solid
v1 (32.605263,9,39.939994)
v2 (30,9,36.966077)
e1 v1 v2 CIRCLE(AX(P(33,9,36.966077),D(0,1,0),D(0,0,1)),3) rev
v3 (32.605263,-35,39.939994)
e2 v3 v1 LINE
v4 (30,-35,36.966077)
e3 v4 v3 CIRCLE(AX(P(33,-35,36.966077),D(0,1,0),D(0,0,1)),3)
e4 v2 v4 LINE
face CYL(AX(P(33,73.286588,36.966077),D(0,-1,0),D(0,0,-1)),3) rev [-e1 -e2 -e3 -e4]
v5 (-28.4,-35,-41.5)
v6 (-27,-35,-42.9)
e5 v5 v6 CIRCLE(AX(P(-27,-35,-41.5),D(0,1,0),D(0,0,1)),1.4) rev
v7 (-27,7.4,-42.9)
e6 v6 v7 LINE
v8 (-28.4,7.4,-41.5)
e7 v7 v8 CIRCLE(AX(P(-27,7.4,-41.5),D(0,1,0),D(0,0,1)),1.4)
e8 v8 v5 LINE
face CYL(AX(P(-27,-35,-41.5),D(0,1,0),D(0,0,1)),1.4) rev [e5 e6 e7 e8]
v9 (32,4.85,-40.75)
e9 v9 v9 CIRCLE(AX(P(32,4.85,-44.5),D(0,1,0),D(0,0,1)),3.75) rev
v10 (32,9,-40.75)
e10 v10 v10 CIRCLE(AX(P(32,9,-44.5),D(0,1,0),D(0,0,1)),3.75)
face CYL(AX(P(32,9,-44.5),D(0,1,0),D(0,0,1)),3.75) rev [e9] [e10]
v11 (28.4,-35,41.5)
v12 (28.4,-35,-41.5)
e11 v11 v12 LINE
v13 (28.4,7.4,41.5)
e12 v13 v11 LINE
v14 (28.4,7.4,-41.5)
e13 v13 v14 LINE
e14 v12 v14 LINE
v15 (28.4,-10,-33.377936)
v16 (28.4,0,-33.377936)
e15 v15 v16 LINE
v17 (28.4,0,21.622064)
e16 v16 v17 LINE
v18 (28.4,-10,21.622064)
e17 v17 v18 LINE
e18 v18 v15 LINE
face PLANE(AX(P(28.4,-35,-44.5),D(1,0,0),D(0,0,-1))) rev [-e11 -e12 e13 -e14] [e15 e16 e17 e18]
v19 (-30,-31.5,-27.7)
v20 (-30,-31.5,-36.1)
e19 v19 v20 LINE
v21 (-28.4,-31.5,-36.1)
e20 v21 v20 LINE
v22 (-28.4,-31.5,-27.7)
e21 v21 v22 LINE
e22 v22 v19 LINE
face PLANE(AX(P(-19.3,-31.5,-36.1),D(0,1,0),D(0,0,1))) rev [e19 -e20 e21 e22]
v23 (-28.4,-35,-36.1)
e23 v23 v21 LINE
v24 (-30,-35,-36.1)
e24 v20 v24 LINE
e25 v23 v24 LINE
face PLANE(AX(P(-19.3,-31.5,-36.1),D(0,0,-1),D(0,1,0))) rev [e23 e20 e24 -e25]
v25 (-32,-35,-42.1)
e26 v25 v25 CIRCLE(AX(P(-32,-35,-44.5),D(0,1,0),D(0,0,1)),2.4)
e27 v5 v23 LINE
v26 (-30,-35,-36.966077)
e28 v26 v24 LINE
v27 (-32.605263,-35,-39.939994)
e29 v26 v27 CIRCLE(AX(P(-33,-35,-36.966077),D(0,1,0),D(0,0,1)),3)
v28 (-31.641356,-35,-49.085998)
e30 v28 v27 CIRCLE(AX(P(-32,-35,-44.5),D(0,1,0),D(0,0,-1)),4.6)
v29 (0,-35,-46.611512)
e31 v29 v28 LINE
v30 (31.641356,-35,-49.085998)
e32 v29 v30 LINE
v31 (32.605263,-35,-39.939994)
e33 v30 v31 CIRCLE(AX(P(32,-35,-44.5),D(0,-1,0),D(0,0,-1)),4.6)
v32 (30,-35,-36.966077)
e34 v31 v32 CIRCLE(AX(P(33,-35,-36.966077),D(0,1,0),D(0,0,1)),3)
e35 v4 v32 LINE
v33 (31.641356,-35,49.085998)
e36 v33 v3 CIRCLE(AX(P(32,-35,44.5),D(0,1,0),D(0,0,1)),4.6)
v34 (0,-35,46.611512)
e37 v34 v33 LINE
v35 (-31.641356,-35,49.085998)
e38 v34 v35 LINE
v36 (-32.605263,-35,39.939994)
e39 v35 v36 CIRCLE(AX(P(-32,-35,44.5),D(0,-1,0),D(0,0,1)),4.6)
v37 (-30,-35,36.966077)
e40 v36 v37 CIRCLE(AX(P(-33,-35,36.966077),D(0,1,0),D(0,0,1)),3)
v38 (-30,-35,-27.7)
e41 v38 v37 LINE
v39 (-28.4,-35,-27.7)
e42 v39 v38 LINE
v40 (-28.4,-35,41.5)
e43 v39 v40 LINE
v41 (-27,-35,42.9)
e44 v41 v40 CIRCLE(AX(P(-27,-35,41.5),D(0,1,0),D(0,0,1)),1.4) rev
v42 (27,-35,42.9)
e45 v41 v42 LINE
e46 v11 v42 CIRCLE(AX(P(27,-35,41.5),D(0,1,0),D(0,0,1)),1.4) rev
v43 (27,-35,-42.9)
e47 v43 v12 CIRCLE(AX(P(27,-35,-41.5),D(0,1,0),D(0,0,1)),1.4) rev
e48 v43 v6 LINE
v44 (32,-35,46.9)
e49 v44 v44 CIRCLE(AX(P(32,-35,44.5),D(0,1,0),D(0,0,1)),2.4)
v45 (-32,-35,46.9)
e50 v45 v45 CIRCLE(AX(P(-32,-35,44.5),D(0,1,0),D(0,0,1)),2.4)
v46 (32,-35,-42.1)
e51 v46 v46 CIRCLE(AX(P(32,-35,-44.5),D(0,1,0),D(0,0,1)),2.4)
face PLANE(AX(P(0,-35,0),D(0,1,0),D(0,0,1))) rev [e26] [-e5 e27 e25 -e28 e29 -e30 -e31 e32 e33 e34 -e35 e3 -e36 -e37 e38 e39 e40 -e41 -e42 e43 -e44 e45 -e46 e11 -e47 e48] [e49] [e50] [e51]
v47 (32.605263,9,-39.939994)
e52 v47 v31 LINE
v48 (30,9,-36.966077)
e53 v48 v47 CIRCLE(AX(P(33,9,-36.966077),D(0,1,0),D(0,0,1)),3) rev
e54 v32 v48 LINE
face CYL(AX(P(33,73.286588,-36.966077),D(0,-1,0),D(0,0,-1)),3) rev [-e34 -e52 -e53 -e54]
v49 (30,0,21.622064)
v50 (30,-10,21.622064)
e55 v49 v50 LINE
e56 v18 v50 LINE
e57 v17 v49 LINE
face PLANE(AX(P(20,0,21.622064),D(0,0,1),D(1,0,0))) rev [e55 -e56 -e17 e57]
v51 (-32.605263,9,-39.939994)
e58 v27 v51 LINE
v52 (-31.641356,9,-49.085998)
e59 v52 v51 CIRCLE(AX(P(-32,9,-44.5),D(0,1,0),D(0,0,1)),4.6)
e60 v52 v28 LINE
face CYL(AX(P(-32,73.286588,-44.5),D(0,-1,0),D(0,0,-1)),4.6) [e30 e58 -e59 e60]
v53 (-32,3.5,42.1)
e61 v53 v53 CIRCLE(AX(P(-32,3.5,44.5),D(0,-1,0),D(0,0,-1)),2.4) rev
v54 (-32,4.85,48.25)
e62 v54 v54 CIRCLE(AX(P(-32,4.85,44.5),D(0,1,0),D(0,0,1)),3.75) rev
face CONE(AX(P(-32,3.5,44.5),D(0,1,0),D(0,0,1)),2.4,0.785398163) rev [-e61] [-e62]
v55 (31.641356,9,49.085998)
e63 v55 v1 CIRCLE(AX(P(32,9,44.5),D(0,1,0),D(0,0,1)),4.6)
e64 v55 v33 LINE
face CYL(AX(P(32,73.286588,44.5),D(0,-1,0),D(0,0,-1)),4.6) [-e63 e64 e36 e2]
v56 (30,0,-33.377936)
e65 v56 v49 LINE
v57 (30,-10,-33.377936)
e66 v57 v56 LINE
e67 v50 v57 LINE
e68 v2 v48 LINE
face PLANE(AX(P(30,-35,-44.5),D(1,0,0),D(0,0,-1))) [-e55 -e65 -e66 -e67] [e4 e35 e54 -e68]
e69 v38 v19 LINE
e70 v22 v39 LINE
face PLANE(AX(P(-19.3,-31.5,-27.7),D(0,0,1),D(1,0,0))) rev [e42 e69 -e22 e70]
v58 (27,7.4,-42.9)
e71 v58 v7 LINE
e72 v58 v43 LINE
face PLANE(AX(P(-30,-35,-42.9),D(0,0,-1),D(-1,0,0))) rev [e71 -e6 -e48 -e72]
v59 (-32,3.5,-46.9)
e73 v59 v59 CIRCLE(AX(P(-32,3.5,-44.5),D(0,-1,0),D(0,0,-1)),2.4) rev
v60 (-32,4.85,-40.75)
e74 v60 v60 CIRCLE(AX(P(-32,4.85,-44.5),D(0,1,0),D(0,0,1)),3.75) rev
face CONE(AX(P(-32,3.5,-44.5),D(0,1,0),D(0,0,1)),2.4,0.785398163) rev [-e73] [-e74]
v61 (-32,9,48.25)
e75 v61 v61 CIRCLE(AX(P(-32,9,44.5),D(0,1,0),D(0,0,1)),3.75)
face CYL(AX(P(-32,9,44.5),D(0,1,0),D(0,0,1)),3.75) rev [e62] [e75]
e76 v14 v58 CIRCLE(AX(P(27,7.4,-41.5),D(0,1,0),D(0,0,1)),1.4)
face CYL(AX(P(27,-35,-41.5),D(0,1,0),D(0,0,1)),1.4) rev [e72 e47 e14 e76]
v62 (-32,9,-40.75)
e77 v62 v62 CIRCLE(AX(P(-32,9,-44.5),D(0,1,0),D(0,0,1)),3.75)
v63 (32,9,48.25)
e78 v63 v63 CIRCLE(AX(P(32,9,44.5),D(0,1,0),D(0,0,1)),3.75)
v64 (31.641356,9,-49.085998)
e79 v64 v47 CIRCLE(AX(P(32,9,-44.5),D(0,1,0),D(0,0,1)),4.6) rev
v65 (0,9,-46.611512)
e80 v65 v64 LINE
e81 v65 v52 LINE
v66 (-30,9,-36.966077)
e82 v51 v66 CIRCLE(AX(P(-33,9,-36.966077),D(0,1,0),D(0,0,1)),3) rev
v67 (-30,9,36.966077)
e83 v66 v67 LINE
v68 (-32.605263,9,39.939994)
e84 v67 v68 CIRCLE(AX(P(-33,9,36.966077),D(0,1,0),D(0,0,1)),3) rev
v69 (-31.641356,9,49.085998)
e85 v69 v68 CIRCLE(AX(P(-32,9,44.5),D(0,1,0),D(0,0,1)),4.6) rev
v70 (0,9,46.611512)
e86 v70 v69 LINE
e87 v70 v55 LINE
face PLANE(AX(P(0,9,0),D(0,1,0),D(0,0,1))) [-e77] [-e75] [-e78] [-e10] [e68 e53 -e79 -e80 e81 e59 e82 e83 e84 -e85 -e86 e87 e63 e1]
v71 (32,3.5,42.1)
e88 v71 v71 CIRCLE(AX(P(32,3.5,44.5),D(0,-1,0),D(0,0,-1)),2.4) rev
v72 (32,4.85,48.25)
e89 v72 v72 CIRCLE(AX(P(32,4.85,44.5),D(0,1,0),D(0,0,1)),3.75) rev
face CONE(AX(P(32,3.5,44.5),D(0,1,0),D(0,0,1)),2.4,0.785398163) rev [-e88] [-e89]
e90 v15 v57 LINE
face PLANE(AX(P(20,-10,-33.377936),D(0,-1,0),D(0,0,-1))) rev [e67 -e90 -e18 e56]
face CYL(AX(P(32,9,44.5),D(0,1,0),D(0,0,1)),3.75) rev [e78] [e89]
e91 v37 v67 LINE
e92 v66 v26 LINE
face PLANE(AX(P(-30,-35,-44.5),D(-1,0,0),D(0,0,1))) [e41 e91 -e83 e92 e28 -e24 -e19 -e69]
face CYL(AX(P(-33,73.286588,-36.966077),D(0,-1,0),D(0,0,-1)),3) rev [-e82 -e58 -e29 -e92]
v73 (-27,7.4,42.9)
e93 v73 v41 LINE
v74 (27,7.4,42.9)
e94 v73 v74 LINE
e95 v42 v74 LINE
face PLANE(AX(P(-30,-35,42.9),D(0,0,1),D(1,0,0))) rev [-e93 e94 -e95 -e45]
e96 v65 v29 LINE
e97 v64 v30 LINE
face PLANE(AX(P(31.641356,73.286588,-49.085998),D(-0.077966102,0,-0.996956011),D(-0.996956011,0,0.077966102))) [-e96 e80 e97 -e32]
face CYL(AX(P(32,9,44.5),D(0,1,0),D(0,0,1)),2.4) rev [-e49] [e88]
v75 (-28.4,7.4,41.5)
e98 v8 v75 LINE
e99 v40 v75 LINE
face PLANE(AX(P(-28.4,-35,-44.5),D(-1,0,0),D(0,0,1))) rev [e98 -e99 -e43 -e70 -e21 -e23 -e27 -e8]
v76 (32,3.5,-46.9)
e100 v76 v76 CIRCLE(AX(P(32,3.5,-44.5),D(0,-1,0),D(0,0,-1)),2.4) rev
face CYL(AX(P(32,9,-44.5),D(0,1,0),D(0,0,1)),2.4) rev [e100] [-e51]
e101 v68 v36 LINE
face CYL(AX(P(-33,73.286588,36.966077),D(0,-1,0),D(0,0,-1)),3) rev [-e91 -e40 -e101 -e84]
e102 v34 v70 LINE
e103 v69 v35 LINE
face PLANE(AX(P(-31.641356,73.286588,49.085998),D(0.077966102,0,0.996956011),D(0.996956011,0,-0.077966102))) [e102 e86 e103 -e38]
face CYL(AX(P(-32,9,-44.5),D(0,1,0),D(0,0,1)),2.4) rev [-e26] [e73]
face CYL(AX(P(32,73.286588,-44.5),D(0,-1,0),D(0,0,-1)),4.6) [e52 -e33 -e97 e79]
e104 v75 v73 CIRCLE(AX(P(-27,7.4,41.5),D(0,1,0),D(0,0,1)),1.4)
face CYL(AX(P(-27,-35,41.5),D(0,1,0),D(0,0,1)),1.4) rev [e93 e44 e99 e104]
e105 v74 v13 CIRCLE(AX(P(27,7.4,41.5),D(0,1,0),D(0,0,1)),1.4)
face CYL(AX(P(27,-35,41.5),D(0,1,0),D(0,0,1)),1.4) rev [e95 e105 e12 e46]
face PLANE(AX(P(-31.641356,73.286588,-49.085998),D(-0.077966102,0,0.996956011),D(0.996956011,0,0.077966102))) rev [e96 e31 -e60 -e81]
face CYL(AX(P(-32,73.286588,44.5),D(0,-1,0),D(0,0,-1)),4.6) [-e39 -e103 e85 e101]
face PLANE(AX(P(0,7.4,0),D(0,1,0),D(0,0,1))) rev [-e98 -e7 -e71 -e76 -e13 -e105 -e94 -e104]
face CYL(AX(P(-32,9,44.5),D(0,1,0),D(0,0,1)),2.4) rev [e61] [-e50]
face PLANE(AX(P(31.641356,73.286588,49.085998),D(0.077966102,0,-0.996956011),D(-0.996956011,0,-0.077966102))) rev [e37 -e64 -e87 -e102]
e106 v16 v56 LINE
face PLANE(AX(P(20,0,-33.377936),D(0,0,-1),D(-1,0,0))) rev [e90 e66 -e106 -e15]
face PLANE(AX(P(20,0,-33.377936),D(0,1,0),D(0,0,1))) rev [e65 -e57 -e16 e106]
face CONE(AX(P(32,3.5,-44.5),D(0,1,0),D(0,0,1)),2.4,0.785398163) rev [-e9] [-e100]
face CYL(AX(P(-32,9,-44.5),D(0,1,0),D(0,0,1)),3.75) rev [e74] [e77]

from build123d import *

# Parameters (mm, degrees)
BASE_DEPTH                               = 9
BASE_DEPTH_BACK                          = 35
SKETCH1_W                                = 60
SKETCH1_H                                = 89
OUTSIDE_OF_BASE_R                        = 3
INSIDE_OF_BASE_T                         = -1.6
TOP_START                                = -44
TOP_FASTENING_BODY_DEPTH                 = 44
CBORE_FOR_M4_SHCS1_D                     = 4.8
CBORE_FOR_M4_SHCS1_CBORE_D               = 7.5
CBORE_FOR_M4_SHCS1_CBORE_DEPTH           = 4
TFB_START                                = -44
TFB_M_V_COPY_1_DEPTH                     = 44
TFB_M_V_COPY_2_D                         = 4.8
TFB_M_V_COPY_2_CBORE_D                   = 7.5
TFB_M_V_COPY_2_CBORE_DEPTH               = 4
SKETCH12_W                               = 8.4
SKETCH12_H                               = 3.5
MICROUSB_DEPTH                           = 1.6
F_3D_PRINTING_FOR_FASTENING_FEATURE_SIZE = 1.5
TFB_OUTER_R                              = 3
SKETCH28_W                               = 55
SKETCH28_H                               = 10
CUT_EXTRUDE1_DEPTH                       = 10


with BuildPart() as part:
    # Sketch1 → BASE (new, two sides: drawn at the far end of the back side and taken through both)
    with BuildSketch(Plane(origin=(0, 0, 0), x_dir=(1, 0, 0), z_dir=(0, 1, 0)).offset(-BASE_DEPTH_BACK)):
        Rectangle(SKETCH1_W, SKETCH1_H)
    extrude(amount=BASE_DEPTH + BASE_DEPTH_BACK)

    # OUTSIDE OF BASE
    outside_of_base_edges = [part.edges().sort_by_distance(p)[0] for p in [
        (30, -13, 44.5),
        (-30, -13, 44.5),
        (-30, -13, -44.5),
        (30, -13, -44.5),
    ]]
    fillet(outside_of_base_edges, radius=OUTSIDE_OF_BASE_R)

    # INSIDE OF BASE
    inside_of_base_openings = [part.faces().sort_by_distance(p)[0] for p in [
        (0, -35, 0),
    ]]
    offset(amount=INSIDE_OF_BASE_T, openings=inside_of_base_openings, kind=Kind.INTERSECTION)

    # Sketch22 → TOP FASTENING BODY (add)
    with BuildSketch(Plane.XZ.offset(35).offset(TOP_START)):
        with BuildLine():
            Line((-31.641355932, 49.085997649), (27, 44.5))
            Line((27, 44.5), (-27, 44.5))
            ThreePointArc((-27, 44.5), (-29.121320344, 43.621320344), (-30, 41.5))
            Line((-30, 41.5), (-30, 39.729546587))
            Line((-30, 39.729546587), (-32.358644068, 39.914002351))
            ThreePointArc((-32.358644068, 39.914002351), (-36.585997649, 44.858644068), (-31.641355932, 49.085997649))
        make_face()
    top_fastening_body = extrude(amount=TOP_FASTENING_BODY_DEPTH)

    # CBORE for M4 SHCS1 (through all)
    with Locations(Plane(origin=(0, 9, 0), x_dir=(1, 0, 0), z_dir=(0, 1, 0))):
        with Locations((-32, -44.5)):
            cbore_for_m4_shcs1 = CounterBoreHole(CBORE_FOR_M4_SHCS1_D / 2, CBORE_FOR_M4_SHCS1_CBORE_D / 2, CBORE_FOR_M4_SHCS1_CBORE_DEPTH)

    # TFB M H: TOP FASTENING BODY, CBORE for M4 SHCS1 across plane
    add(top_fastening_body.mirror(Plane(origin=(0, 0, 0), x_dir=(0, 0, 1), z_dir=(1, 0, 0))))
    add(cbore_for_m4_shcs1.mirror(Plane(origin=(0, 0, 0), x_dir=(0, 0, 1), z_dir=(1, 0, 0))), mode=Mode.SUBTRACT)

    # TFB M V: TOP FASTENING BODY, CBORE for M4 SHCS1 across plane
    add(top_fastening_body.mirror(Plane.XY))
    add(cbore_for_m4_shcs1.mirror(Plane.XY), mode=Mode.SUBTRACT)

    # TFB M V copy 1 sketch → TFB M V copy 1 (add)
    with BuildSketch(Plane(origin=(0, -35, 0), x_dir=(-1, 0, 0), z_dir=(0, -1, 0)).offset(TFB_START)):
        with BuildLine():
            Line((-31.641355932, 49.085997649), (27, 44.5))
            Line((27, 44.5), (-27, 44.5))
            ThreePointArc((-27, 44.5), (-29.121320344, 43.621320344), (-30, 41.5))
            Line((-30, 41.5), (-30, 39.729546587))
            Line((-30, 39.729546587), (-32.358644068, 39.914002351))
            ThreePointArc((-32.358644068, 39.914002351), (-36.585997649, 44.858644068), (-31.641355932, 49.085997649))
        make_face()
    extrude(amount=TFB_M_V_COPY_1_DEPTH)

    # TFB M V copy 2 (through all)
    with Locations(Plane(origin=(0, 9, 0), x_dir=(-1, 0, 0), z_dir=(0, 1, 0))):
        with Locations((-32, -44.5)):
            CounterBoreHole(TFB_M_V_COPY_2_D / 2, TFB_M_V_COPY_2_CBORE_D / 2, TFB_M_V_COPY_2_CBORE_DEPTH)

    # Sketch12 → MICROUSB (cut)
    with BuildSketch(Plane.ZY.offset(30)):
        with Locations((-31.9, -33.25)):
            Rectangle(SKETCH12_W, SKETCH12_H)
    extrude(amount=-MICROUSB_DEPTH, mode=Mode.SUBTRACT)

    # 3D PRINTING FOR FASTENING FEATURE
    # the kernel refuses this chamfer: 1.5 mm, written as the material it takes off along each edge
    with BuildSketch(Plane(origin=(32, 5, 44.5), x_dir=(1, 0, 0), z_dir=(0, 0, 1))) as f_3d_printing_for_fastening_feature_piece_1_section:
        Polygon((2.4 + F_3D_PRINTING_FOR_FASTENING_FEATURE_SIZE, 0), (2.4, -F_3D_PRINTING_FOR_FASTENING_FEATURE_SIZE), (2.4, 0), align=None)
    f_3d_printing_for_fastening_feature_piece_1 = revolve(axis=Axis((32, 5, 44.5), (0, 1, 0)), mode=Mode.PRIVATE)
    f_3d_printing_for_fastening_feature_piece_1 = f_3d_printing_for_fastening_feature_piece_1 & Plane(origin=(32, 4.173590616, 44.5), x_dir=(-1, 0, 0), z_dir=(0, 1, 0)) * Cylinder(3.75, 16, mode=Mode.PRIVATE)
    add(f_3d_printing_for_fastening_feature_piece_1, mode=Mode.SUBTRACT)
    with BuildSketch(Plane(origin=(32, 5, -44.5), x_dir=(1, 0, 0), z_dir=(0, 0, -1))) as f_3d_printing_for_fastening_feature_piece_2_section:
        Polygon((2.4 + F_3D_PRINTING_FOR_FASTENING_FEATURE_SIZE, 0), (2.4, F_3D_PRINTING_FOR_FASTENING_FEATURE_SIZE), (2.4, 0), align=None)
    f_3d_printing_for_fastening_feature_piece_2 = revolve(axis=Axis((32, 5, -44.5), (0, -1, 0)), mode=Mode.PRIVATE)
    f_3d_printing_for_fastening_feature_piece_2 = f_3d_printing_for_fastening_feature_piece_2 & Plane(origin=(32, 4.173590616, -44.5), x_dir=(-1, 0, 0), z_dir=(0, 1, 0)) * Cylinder(3.75, 16, mode=Mode.PRIVATE)
    add(f_3d_printing_for_fastening_feature_piece_2, mode=Mode.SUBTRACT)
    with BuildSketch(Plane(origin=(-32, 5, -44.5), x_dir=(-1, 0, 0), z_dir=(0, 0, -1))) as f_3d_printing_for_fastening_feature_piece_3_section:
        Polygon((2.4 + F_3D_PRINTING_FOR_FASTENING_FEATURE_SIZE, 0), (2.4, -F_3D_PRINTING_FOR_FASTENING_FEATURE_SIZE), (2.4, 0), align=None)
    f_3d_printing_for_fastening_feature_piece_3 = revolve(axis=Axis((-32, 5, -44.5), (0, 1, 0)), mode=Mode.PRIVATE)
    f_3d_printing_for_fastening_feature_piece_3 = f_3d_printing_for_fastening_feature_piece_3 & Plane(origin=(-32, 4.173590616, -44.5), x_dir=(1, 0, 0), z_dir=(0, 1, 0)) * Cylinder(3.75, 16, mode=Mode.PRIVATE)
    add(f_3d_printing_for_fastening_feature_piece_3, mode=Mode.SUBTRACT)
    with BuildSketch(Plane(origin=(-32, 5, 44.5), x_dir=(-1, 0, 0), z_dir=(0, 0, 1))) as f_3d_printing_for_fastening_feature_piece_4_section:
        Polygon((2.4 + F_3D_PRINTING_FOR_FASTENING_FEATURE_SIZE, 0), (2.4, F_3D_PRINTING_FOR_FASTENING_FEATURE_SIZE), (2.4, 0), align=None)
    f_3d_printing_for_fastening_feature_piece_4 = revolve(axis=Axis((-32, 5, 44.5), (0, -1, 0)), mode=Mode.PRIVATE)
    f_3d_printing_for_fastening_feature_piece_4 = f_3d_printing_for_fastening_feature_piece_4 & Plane(origin=(-32, 4.173590616, 44.5), x_dir=(1, 0, 0), z_dir=(0, 1, 0)) * Cylinder(3.75, 16, mode=Mode.PRIVATE)
    add(f_3d_printing_for_fastening_feature_piece_4, mode=Mode.SUBTRACT)

    # TFB OUTER
    tfb_outer_edges = [part.edges().sort_by_distance(p)[0] for p in [
        (30, -13, 39.729546587),
        (30, -13, -39.729546587),
        (-30, -13, -39.729546587),
        (-30, -13, 39.729546587),
    ]]
    fillet(tfb_outer_edges, radius=TFB_OUTER_R)

    # Sketch28 → Cut-Extrude1 (cut)
    with BuildSketch(Plane(origin=(30, 0, 0), x_dir=(0, 0, -1), z_dir=(1, 0, 0))):
        with Locations((5.877935747, -5)):
            Rectangle(SKETCH28_W, SKETCH28_H)
    extrude(amount=-CUT_EXTRUDE1_DEPTH, mode=Mode.SUBTRACT)


solid = part.part
